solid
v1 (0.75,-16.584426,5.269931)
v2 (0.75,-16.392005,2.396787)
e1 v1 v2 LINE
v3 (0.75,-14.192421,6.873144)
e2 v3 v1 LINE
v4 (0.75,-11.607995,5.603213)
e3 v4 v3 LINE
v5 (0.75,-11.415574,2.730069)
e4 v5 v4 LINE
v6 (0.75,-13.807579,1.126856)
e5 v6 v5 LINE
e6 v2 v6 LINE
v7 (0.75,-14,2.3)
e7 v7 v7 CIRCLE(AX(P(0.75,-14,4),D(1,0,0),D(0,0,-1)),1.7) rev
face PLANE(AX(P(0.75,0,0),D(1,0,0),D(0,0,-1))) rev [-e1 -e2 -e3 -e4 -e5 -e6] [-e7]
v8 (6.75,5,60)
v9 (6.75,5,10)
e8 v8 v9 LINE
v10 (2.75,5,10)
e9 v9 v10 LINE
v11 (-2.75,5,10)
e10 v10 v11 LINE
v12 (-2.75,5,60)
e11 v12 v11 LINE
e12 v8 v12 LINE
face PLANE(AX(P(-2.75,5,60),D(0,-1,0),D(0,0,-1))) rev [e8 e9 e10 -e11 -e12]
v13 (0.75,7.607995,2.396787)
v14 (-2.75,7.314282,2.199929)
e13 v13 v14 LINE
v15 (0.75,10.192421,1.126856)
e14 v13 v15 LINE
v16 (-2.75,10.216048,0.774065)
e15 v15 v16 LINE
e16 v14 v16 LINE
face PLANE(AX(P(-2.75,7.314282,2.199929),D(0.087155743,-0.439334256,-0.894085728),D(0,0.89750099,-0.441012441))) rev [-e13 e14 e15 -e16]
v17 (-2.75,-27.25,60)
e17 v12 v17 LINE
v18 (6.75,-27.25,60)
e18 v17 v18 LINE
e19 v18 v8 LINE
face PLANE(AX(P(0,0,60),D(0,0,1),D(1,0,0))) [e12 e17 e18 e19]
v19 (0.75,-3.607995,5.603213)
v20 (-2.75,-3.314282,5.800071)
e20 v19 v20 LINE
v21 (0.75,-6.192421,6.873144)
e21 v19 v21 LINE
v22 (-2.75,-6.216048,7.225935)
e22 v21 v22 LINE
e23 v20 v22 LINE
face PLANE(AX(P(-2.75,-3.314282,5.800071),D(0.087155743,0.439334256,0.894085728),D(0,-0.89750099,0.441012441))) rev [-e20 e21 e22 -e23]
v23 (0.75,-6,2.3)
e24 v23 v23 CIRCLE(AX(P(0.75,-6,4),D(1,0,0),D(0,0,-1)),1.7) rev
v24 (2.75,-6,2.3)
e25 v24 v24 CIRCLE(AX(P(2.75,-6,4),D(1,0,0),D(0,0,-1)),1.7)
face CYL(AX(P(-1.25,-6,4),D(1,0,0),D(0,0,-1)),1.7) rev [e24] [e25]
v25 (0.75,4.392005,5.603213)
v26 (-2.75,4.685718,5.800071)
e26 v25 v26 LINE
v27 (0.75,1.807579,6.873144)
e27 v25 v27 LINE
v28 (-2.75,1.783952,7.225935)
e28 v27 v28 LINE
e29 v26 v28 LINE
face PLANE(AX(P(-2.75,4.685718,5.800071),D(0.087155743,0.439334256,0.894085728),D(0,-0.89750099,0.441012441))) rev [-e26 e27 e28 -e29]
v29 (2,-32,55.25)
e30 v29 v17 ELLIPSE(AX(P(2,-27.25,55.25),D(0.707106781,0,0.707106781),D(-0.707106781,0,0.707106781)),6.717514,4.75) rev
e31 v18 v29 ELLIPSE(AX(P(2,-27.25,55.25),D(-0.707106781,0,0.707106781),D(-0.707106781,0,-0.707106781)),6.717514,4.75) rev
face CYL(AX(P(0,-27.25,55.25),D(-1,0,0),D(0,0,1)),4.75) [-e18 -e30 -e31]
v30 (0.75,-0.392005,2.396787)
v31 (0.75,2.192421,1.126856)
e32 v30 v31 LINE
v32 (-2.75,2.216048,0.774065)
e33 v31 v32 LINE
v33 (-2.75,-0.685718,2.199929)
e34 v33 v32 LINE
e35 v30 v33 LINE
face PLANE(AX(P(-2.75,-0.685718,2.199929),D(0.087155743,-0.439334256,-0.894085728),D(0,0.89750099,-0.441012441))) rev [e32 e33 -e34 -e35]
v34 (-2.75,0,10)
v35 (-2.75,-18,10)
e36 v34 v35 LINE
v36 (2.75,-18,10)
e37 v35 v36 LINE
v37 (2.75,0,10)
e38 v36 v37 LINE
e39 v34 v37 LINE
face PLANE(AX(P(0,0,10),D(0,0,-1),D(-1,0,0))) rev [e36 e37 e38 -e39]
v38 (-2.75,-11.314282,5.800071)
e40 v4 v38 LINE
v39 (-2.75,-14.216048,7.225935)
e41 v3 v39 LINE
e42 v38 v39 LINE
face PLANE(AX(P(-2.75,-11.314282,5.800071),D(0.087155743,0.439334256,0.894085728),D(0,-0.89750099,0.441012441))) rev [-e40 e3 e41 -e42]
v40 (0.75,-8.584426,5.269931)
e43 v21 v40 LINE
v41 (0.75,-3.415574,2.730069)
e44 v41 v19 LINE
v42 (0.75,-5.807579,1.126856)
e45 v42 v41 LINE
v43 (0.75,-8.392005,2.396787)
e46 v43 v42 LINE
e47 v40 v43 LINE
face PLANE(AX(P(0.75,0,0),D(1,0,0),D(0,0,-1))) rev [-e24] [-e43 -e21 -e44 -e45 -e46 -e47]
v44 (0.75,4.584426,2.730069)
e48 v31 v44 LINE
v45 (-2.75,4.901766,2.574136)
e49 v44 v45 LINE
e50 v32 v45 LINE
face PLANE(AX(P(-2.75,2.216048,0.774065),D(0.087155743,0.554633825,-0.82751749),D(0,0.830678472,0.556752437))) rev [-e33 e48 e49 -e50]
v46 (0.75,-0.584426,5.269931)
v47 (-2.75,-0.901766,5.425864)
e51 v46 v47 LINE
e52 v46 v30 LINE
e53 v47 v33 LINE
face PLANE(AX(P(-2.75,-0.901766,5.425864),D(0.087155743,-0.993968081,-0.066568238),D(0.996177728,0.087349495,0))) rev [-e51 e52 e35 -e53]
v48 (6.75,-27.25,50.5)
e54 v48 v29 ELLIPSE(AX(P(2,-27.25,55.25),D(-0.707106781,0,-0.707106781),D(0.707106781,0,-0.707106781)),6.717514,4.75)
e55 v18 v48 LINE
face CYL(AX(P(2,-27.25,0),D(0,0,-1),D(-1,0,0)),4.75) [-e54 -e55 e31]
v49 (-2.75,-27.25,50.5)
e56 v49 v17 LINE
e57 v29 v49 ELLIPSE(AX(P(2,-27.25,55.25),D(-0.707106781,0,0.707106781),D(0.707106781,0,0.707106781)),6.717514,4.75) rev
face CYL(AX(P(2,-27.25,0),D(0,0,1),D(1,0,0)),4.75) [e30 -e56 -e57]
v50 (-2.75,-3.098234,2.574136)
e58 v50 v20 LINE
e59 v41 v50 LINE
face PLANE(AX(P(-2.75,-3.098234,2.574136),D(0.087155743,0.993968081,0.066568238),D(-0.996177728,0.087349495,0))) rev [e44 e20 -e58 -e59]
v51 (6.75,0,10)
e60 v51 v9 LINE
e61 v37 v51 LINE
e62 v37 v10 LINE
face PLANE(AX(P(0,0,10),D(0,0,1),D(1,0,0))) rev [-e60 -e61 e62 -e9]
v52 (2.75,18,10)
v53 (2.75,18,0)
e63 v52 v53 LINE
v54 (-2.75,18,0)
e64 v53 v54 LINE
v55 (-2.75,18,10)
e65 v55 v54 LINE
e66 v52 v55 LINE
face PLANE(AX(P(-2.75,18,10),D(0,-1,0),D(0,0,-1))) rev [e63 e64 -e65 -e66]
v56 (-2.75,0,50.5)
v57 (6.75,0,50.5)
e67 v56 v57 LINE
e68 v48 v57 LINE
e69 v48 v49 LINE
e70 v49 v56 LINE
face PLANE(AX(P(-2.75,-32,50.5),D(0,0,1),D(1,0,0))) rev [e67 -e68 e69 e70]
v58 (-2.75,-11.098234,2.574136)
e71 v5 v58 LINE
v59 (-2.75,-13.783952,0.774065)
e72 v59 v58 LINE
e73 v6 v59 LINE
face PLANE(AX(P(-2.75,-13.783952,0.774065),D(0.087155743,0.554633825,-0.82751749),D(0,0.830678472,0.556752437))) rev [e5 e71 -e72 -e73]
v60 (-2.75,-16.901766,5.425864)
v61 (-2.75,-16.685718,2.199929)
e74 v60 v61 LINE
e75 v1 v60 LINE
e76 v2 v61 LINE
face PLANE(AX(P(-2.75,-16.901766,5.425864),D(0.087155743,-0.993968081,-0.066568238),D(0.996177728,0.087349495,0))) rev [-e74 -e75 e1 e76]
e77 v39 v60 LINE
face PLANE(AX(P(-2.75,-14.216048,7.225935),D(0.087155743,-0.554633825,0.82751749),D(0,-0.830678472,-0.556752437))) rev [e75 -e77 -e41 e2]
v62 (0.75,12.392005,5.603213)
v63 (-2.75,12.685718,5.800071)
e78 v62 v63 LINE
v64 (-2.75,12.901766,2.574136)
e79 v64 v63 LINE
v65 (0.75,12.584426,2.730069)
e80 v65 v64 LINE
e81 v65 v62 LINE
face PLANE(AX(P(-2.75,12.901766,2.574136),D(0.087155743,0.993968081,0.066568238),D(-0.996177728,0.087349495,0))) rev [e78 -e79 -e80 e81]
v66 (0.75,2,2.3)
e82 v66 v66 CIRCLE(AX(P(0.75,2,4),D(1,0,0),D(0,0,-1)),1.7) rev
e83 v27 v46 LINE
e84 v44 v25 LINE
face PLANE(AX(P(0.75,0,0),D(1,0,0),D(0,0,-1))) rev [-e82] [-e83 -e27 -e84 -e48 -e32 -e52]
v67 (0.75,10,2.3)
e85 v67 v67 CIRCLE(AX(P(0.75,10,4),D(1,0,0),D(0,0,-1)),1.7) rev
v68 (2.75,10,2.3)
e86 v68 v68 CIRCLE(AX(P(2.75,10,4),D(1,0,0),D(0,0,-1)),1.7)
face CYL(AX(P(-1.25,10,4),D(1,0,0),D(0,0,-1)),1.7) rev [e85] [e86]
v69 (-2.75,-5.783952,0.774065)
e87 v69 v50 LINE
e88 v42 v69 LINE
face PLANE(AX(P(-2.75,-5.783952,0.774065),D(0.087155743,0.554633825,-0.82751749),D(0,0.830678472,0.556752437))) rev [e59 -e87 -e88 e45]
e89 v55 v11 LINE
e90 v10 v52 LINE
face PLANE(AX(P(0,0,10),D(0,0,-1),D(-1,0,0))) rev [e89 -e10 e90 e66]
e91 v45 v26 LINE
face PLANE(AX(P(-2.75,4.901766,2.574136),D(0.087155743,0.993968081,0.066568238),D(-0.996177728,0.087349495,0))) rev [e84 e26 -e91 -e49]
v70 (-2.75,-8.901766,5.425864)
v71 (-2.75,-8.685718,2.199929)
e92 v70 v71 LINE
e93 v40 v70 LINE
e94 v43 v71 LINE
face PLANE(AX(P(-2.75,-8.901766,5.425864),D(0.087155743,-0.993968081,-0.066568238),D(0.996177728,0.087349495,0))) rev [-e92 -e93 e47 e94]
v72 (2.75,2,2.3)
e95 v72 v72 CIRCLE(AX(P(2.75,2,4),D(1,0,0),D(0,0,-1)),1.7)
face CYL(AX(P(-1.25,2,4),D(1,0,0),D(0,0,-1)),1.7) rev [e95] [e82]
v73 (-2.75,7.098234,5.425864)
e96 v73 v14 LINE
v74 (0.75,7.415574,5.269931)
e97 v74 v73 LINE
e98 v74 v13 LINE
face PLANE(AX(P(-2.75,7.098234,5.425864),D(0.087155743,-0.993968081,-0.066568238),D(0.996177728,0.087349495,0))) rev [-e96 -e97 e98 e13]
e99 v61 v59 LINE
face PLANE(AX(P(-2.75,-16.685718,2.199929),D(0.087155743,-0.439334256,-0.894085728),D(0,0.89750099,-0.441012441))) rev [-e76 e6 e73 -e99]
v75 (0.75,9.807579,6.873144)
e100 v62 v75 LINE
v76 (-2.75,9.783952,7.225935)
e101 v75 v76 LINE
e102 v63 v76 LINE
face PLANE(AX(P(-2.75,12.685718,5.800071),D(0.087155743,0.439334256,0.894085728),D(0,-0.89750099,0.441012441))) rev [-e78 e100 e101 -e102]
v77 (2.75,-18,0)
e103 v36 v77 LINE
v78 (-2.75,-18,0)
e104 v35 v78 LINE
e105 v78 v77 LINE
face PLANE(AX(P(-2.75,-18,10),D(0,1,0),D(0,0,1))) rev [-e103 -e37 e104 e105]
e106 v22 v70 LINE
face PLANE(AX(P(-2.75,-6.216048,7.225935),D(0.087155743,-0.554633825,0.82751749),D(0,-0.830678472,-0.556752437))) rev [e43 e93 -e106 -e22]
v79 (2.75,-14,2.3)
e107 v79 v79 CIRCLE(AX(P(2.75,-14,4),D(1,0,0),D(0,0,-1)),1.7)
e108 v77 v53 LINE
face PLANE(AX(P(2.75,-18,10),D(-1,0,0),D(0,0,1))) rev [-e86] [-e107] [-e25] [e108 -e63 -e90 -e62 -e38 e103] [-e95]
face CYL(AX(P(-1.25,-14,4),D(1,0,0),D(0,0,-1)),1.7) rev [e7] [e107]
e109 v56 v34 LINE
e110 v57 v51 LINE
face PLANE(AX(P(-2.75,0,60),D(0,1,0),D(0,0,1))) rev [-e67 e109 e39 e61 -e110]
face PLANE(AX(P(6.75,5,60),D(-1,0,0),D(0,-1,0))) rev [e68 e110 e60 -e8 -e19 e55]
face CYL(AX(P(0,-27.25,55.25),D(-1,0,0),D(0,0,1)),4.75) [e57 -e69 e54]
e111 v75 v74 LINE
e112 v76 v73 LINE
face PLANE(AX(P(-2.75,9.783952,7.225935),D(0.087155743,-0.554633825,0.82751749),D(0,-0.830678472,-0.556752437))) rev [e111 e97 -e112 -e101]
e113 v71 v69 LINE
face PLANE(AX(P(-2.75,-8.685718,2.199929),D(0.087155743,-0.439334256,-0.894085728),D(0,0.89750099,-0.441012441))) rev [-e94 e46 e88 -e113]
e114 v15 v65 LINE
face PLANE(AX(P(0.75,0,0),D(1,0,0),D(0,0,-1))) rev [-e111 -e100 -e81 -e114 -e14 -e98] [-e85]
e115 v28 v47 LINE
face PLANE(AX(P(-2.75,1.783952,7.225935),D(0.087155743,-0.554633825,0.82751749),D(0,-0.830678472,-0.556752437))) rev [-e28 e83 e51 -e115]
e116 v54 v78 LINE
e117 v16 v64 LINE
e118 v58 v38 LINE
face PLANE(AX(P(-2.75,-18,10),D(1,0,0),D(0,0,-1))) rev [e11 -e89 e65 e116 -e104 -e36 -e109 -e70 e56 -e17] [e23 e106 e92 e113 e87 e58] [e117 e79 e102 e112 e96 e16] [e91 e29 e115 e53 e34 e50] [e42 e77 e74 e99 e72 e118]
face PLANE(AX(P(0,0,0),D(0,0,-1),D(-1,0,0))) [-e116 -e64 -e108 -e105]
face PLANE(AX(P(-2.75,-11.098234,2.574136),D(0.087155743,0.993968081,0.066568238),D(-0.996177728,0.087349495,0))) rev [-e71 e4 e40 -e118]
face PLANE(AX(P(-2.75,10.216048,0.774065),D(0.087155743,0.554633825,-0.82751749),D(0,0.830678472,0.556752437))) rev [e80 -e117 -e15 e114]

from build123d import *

# Parameters (mm, degrees)
ESQUISSE1_W                       = 5.5
ESQUISSE1_H                       = 36
BOSS_EXTRU_1_DEPTH                = 10
ESQUISSE2_R                       = 1.7
ENL_V_MAT_EXTRU_1_DEPTH           = 4
ENL_V_MAT_EXTRU_2_DEPTH           = 3.5
ENL_V_MAT_EXTRU_2_DRAFT           = 5
ENL_V_MAT_EXTRU_2_PROFILE_2_DEPTH = 3.5
ENL_V_MAT_EXTRU_2_PROFILE_2_DRAFT = 5
ENL_V_MAT_EXTRU_2_PROFILE_3_DEPTH = 3.5
ENL_V_MAT_EXTRU_2_PROFILE_3_DRAFT = 5
ENL_V_MAT_EXTRU_2_PROFILE_4_DEPTH = 3.5
ENL_V_MAT_EXTRU_2_PROFILE_4_DRAFT = 5
ESQUISSE4_W                       = 9.5
ESQUISSE4_H                       = 5
BOSS_EXTRU_2_DEPTH                = 50
ESQUISSE5_W                       = 9.5
ESQUISSE5_H                       = 9.5
BOSS_EXTRU_3_DEPTH                = 32
CONG_1_R                          = 4.75


with BuildPart() as part:
    # Esquisse1 → Boss.-Extru.1 (new body)
    with BuildSketch(Plane.XY):
        Rectangle(ESQUISSE1_W, ESQUISSE1_H)
    extrude(amount=BOSS_EXTRU_1_DEPTH)

    # Esquisse2 → Enlèv. mat.-Extru.1 (cut)
    with BuildSketch(Plane(origin=(2.75, 0, 0), x_dir=(0, 0, -1), z_dir=(1, 0, 0))):
        with Locations((-4, 10)):
            Circle(ESQUISSE2_R)
        with Locations((-4, 2)):
            Circle(ESQUISSE2_R)
        with Locations((-4, -6)):
            Circle(ESQUISSE2_R)
        with Locations((-4, -14)):
            Circle(ESQUISSE2_R)
    extrude(amount=-ENL_V_MAT_EXTRU_1_DEPTH, mode=Mode.SUBTRACT)


with BuildPart() as enl_v_mat_extru_2_tool:
    # Esquisse3 → Enlèv. mat.-Extru.2 (with draft: the straight prism first)
    with BuildSketch(Plane(origin=(-2.75, 0, 0), x_dir=(0, 0, -1), z_dir=(1, 0, 0))):
        Polygon((-2.574135551, 4.901765653), (-5.800070547, 4.685717662), (-7.225934996, 1.783952009), (-5.425864449, -0.901765653), (-2.199929453, -0.685717662), (-0.774065004, 2.216047991), align=None)
    extrude(amount=ENL_V_MAT_EXTRU_2_DEPTH)
    # Enlèv. mat.-Extru.2: the draft: its side faces are tilted about the plane it starts from
    enl_v_mat_extru_2_sides = [enl_v_mat_extru_2_tool.faces().sort_by_distance(p)[0] for p in [
        (-1, 4.793741658, 4.187103049),
        (-1, 3.234834835, 6.513002771),
        (-1, 0.441093178, 6.325899723),
        (-1, -0.793741658, 3.812896951),
        (-1, 0.765165165, 1.486997229),
        (-1, 3.558906822, 1.674100277),
    ]]
    draft(enl_v_mat_extru_2_sides, Plane(origin=(-2.75, 0, 0), x_dir=(0, 0, -1), z_dir=(1, 0, 0)), ENL_V_MAT_EXTRU_2_DRAFT)


with BuildPart() as part_1:
    add(part.part)

    # Enlèv. mat.-Extru.2: cut by enl_v_mat_extru_2_tool
    add(enl_v_mat_extru_2_tool.part, mode=Mode.SUBTRACT)


with BuildPart() as enl_v_mat_extru_2_profile_2_tool:
    # Esquisse3 → Enlèv. mat.-Extru.2 profile 2 (with draft: the straight prism first)
    with BuildSketch(Plane(origin=(-2.75, 0, 0), x_dir=(0, 0, -1), z_dir=(1, 0, 0))):
        Polygon((-2.574135551, 12.901765653), (-5.800070547, 12.685717662), (-7.225934996, 9.783952009), (-5.425864449, 7.098234347), (-2.199929453, 7.314282338), (-0.774065004, 10.216047991), align=None)
    extrude(amount=ENL_V_MAT_EXTRU_2_PROFILE_2_DEPTH)
    # Enlèv. mat.-Extru.2 profile 2: the draft: its side faces are tilted about the plane it starts from
    enl_v_mat_extru_2_profile_2_sides = [enl_v_mat_extru_2_profile_2_tool.faces().sort_by_distance(p)[0] for p in [
        (-1, 12.793741658, 4.187103049),
        (-1, 11.234834835, 6.513002771),
        (-1, 8.441093178, 6.325899723),
        (-1, 7.206258342, 3.812896951),
        (-1, 8.765165165, 1.486997229),
        (-1, 11.558906822, 1.674100277),
    ]]
    draft(enl_v_mat_extru_2_profile_2_sides, Plane(origin=(-2.75, 0, 0), x_dir=(0, 0, -1), z_dir=(1, 0, 0)), ENL_V_MAT_EXTRU_2_PROFILE_2_DRAFT)


with BuildPart() as part_2:
    add(part_1.part)

    # Enlèv. mat.-Extru.2 profile 2: cut by enl_v_mat_extru_2_profile_2_tool
    add(enl_v_mat_extru_2_profile_2_tool.part, mode=Mode.SUBTRACT)


with BuildPart() as enl_v_mat_extru_2_profile_3_tool:
    # Esquisse3 → Enlèv. mat.-Extru.2 profile 3 (with draft: the straight prism first)
    with BuildSketch(Plane(origin=(-2.75, 0, 0), x_dir=(0, 0, -1), z_dir=(1, 0, 0))):
        Polygon((-2.574135551, -3.098234347), (-5.800070547, -3.314282338), (-7.225934996, -6.216047991), (-5.425864449, -8.901765653), (-2.199929453, -8.685717662), (-0.774065004, -5.783952009), align=None)
    extrude(amount=ENL_V_MAT_EXTRU_2_PROFILE_3_DEPTH)
    # Enlèv. mat.-Extru.2 profile 3: the draft: its side faces are tilted about the plane it starts from
    enl_v_mat_extru_2_profile_3_sides = [enl_v_mat_extru_2_profile_3_tool.faces().sort_by_distance(p)[0] for p in [
        (-1, -3.206258342, 4.187103049),
        (-1, -4.765165165, 6.513002771),
        (-1, -7.558906822, 6.325899723),
        (-1, -8.793741658, 3.812896951),
        (-1, -7.234834835, 1.486997229),
        (-1, -4.441093178, 1.674100277),
    ]]
    draft(enl_v_mat_extru_2_profile_3_sides, Plane(origin=(-2.75, 0, 0), x_dir=(0, 0, -1), z_dir=(1, 0, 0)), ENL_V_MAT_EXTRU_2_PROFILE_3_DRAFT)


with BuildPart() as part_3:
    add(part_2.part)

    # Enlèv. mat.-Extru.2 profile 3: cut by enl_v_mat_extru_2_profile_3_tool
    add(enl_v_mat_extru_2_profile_3_tool.part, mode=Mode.SUBTRACT)


with BuildPart() as enl_v_mat_extru_2_profile_4_tool:
    # Esquisse3 → Enlèv. mat.-Extru.2 profile 4 (with draft: the straight prism first)
    with BuildSketch(Plane(origin=(-2.75, 0, 0), x_dir=(0, 0, -1), z_dir=(1, 0, 0))):
        Polygon((-2.574135551, -11.098234347), (-5.800070547, -11.314282338), (-7.225934996, -14.216047991), (-5.425864449, -16.901765653), (-2.199929453, -16.685717662), (-0.774065004, -13.783952009), align=None)
    extrude(amount=ENL_V_MAT_EXTRU_2_PROFILE_4_DEPTH)
    # Enlèv. mat.-Extru.2 profile 4: the draft: its side faces are tilted about the plane it starts from
    enl_v_mat_extru_2_profile_4_sides = [enl_v_mat_extru_2_profile_4_tool.faces().sort_by_distance(p)[0] for p in [
        (-1, -11.206258342, 4.187103049),
        (-1, -12.765165165, 6.513002771),
        (-1, -15.558906822, 6.325899723),
        (-1, -16.793741658, 3.812896951),
        (-1, -15.234834835, 1.486997229),
        (-1, -12.441093178, 1.674100277),
    ]]
    draft(enl_v_mat_extru_2_profile_4_sides, Plane(origin=(-2.75, 0, 0), x_dir=(0, 0, -1), z_dir=(1, 0, 0)), ENL_V_MAT_EXTRU_2_PROFILE_4_DRAFT)


with BuildPart() as part_4:
    add(part_3.part)

    # Enlèv. mat.-Extru.2 profile 4: cut by enl_v_mat_extru_2_profile_4_tool
    add(enl_v_mat_extru_2_profile_4_tool.part, mode=Mode.SUBTRACT)

    # Esquisse4 → Boss.-Extru.2 (add)
    with BuildSketch(Plane.XY.offset(10)):
        with Locations((2, 2.5)):
            Rectangle(ESQUISSE4_W, ESQUISSE4_H)
    extrude(amount=BOSS_EXTRU_2_DEPTH)

    # Esquisse5 → Boss.-Extru.3 (add)
    with BuildSketch(Plane.XZ):
        with Locations((2, 55.25)):
            Rectangle(ESQUISSE5_W, ESQUISSE5_H)
    extrude(amount=BOSS_EXTRU_3_DEPTH)

    # Congé1
    cong_1_edges = [part_4.edges().sort_by_distance(p)[0] for p in [
        (-2.75, -32, 55.25),
        (2, -32, 50.5),
        (6.75, -32, 55.25),
        (2, -32, 60),
    ]]
    fillet(cong_1_edges, radius=CONG_1_R - 0.0001)  # a hair under: the kernel refuses the full size


solid = part_4.part
